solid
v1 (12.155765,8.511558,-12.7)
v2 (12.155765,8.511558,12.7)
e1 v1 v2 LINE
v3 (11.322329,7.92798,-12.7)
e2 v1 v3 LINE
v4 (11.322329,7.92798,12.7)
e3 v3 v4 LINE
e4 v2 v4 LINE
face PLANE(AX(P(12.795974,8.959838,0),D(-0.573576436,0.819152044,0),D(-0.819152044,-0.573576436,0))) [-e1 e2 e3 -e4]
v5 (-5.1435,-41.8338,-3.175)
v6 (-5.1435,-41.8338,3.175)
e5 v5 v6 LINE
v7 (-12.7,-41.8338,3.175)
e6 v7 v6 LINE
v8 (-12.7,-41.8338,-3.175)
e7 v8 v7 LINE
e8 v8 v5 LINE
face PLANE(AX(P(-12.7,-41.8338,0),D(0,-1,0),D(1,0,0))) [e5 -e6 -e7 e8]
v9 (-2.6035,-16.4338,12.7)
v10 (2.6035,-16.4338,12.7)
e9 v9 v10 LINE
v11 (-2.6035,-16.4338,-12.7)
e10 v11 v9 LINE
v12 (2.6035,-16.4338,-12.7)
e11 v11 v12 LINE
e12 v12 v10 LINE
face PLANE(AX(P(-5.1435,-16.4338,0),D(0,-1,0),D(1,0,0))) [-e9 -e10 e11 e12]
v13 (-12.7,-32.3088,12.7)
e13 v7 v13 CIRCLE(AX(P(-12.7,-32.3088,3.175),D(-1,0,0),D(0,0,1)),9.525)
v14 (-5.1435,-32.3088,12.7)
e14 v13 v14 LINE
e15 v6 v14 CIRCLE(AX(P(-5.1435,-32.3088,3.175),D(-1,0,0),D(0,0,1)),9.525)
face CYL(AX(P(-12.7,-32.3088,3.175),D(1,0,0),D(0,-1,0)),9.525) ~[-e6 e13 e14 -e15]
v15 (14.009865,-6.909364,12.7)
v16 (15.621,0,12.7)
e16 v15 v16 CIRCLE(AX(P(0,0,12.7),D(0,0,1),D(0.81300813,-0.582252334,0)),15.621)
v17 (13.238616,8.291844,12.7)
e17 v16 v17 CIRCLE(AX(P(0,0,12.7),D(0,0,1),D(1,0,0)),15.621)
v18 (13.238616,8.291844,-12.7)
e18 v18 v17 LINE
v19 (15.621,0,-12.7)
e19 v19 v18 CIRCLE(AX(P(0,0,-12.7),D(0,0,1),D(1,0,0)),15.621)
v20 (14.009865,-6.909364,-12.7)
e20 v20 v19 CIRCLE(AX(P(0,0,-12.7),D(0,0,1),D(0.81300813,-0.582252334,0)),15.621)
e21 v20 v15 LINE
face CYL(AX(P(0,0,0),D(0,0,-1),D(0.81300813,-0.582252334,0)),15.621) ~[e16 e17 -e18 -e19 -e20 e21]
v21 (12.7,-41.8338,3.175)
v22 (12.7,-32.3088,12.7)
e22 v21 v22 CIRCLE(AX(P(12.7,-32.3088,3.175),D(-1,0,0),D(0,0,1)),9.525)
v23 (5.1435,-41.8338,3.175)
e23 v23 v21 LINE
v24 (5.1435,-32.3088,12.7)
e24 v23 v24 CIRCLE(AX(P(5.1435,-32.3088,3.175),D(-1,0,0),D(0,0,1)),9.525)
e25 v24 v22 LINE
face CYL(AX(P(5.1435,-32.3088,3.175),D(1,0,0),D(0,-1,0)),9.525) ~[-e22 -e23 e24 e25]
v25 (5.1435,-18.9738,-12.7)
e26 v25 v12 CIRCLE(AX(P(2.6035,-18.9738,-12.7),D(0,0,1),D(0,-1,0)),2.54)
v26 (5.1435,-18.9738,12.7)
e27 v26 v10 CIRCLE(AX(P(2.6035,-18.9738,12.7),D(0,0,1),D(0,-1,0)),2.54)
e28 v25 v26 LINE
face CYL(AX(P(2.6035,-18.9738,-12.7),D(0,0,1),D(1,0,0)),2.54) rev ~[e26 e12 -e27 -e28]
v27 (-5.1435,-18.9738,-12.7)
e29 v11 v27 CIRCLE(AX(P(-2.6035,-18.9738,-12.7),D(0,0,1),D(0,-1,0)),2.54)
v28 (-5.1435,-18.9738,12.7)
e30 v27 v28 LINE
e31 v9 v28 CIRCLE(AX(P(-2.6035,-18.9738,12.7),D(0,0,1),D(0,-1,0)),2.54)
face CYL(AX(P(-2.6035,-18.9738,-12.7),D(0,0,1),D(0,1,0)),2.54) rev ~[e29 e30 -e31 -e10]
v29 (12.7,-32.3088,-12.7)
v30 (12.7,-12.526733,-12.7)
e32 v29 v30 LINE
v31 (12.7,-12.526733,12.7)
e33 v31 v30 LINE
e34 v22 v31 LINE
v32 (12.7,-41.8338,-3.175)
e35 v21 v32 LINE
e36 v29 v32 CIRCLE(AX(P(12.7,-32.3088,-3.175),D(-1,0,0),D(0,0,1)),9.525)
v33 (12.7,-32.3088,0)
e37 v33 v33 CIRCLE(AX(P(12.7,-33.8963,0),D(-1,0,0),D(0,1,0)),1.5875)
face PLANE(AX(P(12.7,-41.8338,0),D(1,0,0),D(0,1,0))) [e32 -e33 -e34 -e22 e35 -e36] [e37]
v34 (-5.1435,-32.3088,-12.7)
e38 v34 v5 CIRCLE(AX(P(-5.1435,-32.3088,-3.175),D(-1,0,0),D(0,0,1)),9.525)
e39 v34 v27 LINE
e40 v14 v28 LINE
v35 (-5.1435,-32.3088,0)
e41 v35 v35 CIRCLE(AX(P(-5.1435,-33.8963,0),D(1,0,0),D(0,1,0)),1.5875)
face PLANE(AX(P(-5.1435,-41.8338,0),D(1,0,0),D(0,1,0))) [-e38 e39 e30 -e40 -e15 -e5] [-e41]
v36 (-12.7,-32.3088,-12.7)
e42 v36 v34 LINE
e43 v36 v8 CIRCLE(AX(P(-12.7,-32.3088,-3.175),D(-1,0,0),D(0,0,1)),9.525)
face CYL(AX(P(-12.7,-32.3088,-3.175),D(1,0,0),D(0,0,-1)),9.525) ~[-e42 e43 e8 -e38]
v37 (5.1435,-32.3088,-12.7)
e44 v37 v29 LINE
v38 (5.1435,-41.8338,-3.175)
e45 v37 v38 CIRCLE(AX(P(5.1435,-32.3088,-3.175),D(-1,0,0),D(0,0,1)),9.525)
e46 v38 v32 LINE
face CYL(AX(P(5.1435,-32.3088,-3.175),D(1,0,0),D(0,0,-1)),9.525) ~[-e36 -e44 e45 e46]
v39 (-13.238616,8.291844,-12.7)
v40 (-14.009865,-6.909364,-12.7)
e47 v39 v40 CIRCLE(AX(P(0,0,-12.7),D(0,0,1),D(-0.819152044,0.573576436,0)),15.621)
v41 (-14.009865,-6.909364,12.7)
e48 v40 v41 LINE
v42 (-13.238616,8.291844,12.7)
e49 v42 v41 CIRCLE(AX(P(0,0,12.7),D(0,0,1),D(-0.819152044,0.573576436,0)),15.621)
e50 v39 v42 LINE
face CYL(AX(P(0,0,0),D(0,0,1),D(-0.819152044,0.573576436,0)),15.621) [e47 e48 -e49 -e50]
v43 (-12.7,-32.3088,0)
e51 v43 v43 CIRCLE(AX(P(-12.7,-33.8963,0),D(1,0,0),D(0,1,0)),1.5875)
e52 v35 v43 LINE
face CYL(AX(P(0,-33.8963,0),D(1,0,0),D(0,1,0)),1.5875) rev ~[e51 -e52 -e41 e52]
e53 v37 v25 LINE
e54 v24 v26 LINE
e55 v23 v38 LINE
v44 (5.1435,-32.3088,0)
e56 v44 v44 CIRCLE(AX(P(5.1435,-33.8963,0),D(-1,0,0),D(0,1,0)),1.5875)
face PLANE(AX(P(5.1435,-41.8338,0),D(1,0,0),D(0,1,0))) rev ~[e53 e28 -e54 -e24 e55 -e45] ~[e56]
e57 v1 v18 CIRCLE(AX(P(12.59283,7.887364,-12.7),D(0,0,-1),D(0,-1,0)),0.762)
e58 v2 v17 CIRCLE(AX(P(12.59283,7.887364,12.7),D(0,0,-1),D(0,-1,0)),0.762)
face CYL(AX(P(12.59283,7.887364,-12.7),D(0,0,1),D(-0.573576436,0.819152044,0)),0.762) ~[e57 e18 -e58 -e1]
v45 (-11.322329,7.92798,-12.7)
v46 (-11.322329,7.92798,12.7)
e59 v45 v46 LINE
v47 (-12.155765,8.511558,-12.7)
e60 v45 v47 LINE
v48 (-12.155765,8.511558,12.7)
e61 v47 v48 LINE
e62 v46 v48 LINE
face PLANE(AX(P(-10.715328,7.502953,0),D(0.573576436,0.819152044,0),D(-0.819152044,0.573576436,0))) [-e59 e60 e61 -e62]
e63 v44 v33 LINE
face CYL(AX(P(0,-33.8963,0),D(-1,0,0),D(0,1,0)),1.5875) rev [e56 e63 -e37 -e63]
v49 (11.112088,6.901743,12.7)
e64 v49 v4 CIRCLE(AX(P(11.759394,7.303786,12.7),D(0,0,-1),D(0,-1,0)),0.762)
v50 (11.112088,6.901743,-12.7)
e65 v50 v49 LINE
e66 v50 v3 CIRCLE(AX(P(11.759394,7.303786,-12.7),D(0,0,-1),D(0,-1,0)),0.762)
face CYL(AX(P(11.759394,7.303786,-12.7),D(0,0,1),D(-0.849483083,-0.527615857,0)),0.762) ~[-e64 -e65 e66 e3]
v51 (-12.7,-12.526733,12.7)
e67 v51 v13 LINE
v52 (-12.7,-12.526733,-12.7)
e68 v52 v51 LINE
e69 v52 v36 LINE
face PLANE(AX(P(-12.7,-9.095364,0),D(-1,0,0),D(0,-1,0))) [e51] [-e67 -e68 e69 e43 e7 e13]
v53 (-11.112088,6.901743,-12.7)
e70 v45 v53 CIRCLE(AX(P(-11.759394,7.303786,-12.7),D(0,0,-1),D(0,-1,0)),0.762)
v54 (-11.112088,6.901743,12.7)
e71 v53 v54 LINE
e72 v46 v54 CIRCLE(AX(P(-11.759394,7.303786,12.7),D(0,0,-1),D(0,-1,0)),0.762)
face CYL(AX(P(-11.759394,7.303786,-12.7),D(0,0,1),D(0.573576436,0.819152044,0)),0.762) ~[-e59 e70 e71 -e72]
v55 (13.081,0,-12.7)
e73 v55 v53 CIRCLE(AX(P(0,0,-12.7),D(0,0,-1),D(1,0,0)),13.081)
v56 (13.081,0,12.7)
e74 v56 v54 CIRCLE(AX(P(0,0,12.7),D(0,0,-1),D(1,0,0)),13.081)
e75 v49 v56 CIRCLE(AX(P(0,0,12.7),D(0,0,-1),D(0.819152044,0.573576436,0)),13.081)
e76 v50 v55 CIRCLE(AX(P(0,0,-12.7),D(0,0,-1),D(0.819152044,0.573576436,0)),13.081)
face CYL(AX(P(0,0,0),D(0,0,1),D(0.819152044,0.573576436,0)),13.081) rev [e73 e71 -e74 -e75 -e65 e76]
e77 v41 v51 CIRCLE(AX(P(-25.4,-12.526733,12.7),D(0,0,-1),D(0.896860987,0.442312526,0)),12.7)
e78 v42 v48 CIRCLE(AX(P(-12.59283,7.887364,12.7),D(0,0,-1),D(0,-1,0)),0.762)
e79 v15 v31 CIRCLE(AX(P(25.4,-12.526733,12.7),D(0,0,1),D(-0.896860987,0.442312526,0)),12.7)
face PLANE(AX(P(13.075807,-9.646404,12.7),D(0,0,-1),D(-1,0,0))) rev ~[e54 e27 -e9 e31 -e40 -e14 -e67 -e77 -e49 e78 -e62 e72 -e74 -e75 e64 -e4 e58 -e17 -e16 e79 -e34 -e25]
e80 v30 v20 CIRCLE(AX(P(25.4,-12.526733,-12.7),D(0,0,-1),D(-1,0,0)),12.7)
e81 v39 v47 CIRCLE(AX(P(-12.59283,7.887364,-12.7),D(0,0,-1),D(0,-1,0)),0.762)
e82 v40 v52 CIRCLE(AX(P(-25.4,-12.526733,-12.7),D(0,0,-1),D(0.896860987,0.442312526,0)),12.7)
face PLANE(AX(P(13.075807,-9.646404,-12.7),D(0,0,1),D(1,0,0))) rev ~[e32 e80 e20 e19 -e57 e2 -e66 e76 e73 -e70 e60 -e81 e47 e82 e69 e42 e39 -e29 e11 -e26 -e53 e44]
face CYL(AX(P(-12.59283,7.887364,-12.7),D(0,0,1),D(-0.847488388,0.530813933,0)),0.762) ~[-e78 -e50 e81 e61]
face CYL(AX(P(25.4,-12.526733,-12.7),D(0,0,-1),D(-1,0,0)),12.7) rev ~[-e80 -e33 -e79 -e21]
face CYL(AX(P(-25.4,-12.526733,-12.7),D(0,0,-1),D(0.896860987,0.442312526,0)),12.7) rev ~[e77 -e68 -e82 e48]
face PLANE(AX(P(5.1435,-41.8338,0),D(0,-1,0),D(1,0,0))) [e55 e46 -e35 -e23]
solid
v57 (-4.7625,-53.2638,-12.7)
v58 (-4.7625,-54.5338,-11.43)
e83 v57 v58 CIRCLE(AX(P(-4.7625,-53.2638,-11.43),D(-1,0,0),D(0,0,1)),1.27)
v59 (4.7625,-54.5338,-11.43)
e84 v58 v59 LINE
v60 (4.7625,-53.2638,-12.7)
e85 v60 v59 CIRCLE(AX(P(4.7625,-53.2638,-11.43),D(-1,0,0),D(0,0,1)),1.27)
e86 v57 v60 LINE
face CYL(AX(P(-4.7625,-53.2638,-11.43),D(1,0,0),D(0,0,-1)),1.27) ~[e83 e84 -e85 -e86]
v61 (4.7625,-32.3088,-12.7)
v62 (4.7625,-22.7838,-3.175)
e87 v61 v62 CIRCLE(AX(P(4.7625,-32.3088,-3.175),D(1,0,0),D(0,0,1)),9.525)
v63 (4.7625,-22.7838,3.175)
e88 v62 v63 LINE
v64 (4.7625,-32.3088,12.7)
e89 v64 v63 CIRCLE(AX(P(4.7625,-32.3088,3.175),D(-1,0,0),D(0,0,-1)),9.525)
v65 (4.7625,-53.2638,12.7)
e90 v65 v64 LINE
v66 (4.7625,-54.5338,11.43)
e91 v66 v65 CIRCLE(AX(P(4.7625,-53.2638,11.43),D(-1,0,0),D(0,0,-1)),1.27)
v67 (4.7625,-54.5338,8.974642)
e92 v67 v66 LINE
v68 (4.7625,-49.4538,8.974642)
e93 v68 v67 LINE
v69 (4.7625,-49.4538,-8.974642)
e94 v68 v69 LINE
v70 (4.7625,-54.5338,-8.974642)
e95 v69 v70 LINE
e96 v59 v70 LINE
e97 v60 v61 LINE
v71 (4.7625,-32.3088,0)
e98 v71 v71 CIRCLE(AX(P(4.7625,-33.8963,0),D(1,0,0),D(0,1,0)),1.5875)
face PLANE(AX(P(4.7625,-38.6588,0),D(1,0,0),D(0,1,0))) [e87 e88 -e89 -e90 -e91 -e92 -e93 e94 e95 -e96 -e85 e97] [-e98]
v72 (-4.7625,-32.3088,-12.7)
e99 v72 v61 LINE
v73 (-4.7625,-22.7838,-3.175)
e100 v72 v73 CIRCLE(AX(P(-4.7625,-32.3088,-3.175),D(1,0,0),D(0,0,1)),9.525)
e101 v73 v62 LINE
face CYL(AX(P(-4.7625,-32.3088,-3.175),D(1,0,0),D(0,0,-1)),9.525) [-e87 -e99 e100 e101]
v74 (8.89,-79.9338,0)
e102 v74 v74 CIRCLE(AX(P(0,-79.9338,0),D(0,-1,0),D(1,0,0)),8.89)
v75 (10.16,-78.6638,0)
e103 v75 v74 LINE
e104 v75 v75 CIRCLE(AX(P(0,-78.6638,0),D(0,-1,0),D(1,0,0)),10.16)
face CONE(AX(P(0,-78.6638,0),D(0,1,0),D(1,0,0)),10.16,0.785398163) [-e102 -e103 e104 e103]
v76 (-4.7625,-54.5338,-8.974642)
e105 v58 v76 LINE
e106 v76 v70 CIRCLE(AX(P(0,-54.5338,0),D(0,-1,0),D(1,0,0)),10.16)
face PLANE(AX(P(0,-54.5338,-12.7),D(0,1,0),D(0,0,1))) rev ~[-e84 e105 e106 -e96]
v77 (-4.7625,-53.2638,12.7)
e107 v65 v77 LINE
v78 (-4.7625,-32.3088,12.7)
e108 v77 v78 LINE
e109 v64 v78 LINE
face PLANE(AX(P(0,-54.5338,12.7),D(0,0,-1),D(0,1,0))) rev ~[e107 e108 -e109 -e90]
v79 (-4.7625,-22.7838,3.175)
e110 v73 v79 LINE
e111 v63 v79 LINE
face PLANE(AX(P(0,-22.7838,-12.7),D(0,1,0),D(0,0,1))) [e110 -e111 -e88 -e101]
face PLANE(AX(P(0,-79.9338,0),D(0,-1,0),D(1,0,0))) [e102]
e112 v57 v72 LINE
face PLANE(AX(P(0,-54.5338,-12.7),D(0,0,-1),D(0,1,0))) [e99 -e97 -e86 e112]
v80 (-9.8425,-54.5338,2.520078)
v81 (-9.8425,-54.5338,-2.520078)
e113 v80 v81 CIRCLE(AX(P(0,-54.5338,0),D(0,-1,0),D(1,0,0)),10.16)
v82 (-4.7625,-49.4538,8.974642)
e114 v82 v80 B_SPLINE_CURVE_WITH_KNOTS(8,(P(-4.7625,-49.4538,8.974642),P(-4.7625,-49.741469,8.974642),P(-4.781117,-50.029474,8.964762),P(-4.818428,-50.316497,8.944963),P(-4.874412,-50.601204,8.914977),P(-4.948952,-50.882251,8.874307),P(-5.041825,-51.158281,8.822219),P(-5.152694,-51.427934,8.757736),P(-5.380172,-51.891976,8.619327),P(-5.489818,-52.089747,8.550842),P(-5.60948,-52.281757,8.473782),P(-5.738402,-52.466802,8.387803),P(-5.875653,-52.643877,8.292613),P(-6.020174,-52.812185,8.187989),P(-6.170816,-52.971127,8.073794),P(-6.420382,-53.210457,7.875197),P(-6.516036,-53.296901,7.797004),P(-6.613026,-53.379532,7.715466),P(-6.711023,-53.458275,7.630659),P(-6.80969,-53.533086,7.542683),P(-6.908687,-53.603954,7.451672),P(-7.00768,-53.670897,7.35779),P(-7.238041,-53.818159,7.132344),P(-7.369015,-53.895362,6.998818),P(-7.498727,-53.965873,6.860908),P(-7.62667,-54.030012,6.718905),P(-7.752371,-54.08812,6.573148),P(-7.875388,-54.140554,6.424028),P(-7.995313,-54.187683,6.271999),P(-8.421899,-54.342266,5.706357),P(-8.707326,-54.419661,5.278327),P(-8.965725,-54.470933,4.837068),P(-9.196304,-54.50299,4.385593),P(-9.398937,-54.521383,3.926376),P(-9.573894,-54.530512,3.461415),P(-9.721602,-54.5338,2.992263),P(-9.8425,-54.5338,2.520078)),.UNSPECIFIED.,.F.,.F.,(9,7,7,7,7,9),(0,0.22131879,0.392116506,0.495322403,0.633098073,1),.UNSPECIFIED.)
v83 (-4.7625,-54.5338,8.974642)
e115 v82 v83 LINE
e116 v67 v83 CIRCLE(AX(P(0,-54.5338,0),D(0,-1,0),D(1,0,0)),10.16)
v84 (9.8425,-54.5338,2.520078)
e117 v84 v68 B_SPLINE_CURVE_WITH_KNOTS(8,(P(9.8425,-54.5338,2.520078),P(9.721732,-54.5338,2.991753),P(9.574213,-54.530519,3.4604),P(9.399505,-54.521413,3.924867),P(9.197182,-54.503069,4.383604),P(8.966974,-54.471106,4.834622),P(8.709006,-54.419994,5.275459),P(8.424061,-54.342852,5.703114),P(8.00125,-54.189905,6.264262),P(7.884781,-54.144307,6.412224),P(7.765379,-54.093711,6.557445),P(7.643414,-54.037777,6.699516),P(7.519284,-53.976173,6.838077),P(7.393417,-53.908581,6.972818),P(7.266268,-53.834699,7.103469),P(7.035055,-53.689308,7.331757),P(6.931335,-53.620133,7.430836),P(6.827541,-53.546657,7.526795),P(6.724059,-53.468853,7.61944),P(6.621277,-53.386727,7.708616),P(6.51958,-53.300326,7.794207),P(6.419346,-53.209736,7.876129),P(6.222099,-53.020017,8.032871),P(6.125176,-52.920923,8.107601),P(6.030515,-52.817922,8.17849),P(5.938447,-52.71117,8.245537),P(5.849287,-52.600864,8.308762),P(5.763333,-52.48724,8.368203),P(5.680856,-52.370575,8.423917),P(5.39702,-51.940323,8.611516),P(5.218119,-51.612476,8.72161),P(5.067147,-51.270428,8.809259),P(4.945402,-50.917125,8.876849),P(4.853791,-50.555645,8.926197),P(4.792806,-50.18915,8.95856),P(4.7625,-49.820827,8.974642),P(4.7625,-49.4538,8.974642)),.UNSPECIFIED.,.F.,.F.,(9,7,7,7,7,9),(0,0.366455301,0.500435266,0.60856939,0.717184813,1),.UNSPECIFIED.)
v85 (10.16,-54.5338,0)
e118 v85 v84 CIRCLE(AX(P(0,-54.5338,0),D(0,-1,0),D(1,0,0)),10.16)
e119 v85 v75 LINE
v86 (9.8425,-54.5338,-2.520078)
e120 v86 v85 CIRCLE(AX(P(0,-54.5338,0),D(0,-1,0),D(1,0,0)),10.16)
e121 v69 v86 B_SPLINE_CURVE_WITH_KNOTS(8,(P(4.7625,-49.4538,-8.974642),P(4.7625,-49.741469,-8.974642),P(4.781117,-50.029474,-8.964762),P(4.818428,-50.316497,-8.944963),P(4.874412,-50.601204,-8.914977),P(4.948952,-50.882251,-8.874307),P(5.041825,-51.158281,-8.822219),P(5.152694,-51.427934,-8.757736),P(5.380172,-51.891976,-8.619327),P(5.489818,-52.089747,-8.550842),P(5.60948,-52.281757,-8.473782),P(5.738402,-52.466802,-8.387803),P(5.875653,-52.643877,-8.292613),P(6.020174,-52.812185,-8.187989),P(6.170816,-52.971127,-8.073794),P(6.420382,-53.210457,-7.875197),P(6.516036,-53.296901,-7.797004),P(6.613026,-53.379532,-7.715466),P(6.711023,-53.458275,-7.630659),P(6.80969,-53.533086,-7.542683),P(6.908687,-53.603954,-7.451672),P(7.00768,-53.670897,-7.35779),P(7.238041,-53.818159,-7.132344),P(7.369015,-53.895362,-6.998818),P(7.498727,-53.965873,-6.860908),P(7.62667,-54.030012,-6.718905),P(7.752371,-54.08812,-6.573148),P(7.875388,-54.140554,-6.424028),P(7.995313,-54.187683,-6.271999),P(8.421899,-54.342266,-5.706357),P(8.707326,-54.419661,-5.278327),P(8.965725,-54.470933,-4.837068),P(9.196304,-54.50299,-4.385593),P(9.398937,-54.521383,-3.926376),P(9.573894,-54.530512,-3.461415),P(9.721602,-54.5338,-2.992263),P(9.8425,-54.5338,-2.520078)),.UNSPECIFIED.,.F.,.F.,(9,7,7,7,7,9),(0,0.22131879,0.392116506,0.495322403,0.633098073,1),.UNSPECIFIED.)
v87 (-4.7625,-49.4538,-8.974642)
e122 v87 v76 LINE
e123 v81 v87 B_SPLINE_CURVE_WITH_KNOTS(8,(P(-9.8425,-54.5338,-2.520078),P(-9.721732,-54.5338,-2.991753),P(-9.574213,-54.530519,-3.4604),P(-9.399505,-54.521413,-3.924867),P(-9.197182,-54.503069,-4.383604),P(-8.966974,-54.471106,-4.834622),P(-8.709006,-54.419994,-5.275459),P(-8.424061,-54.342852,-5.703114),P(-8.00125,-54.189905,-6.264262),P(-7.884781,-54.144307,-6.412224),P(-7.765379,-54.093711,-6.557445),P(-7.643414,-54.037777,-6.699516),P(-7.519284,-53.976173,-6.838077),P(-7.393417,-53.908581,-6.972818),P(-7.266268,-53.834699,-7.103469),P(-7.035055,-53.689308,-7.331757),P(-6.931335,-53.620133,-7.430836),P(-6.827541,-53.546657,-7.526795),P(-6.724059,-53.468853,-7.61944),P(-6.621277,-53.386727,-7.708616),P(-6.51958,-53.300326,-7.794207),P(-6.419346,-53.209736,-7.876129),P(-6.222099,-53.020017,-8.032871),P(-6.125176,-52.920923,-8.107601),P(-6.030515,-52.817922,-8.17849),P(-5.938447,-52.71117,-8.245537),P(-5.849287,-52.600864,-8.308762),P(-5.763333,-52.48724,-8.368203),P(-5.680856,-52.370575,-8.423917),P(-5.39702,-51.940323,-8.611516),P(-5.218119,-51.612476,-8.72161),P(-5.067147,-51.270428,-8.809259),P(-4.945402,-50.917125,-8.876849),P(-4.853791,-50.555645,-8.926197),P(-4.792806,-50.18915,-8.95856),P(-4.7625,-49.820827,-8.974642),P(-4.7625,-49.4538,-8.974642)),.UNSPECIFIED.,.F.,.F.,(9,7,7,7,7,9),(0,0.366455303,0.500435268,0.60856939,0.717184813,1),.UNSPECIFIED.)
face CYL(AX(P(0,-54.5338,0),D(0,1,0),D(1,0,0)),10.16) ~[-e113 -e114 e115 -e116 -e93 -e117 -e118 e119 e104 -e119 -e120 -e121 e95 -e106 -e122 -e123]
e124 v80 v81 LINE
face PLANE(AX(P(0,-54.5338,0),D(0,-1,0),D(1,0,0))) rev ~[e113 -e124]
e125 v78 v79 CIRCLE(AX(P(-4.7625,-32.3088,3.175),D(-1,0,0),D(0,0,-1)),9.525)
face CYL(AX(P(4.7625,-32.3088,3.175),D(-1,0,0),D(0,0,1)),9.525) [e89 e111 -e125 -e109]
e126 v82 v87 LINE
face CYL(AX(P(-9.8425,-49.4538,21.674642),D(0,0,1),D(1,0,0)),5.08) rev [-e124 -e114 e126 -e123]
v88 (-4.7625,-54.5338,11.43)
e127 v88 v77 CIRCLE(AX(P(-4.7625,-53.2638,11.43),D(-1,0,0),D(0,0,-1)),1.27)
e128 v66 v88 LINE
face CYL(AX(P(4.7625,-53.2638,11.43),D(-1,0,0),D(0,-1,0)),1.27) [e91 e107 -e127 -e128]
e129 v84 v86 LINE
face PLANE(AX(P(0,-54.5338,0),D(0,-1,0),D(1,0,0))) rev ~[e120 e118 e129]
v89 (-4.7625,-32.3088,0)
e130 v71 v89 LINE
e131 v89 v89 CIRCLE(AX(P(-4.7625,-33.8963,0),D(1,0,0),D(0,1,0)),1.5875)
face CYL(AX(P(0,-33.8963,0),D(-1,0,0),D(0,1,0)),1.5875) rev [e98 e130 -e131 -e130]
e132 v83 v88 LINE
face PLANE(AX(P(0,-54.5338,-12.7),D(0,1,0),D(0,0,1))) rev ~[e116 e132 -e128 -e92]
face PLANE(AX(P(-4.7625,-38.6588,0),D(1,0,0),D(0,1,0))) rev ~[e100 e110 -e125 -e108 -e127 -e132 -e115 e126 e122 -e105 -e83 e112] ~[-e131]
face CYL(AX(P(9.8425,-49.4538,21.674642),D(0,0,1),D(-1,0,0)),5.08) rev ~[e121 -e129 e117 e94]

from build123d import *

# Parameters (mm, degrees)
F1_DEPTH      = 12.7
F0_W          = 7.5565
F0_H          = 25.4
F2_DEPTH      = 12.7
F3_T1_DEPTH   = 25.4
F3_T3_DEPTH   = 12.7
F3_T5_DEPTH   = 12.7
F4_R          = 0.762
F5_W          = 31.75
F5_H          = 25.4
F5_R          = 1.5875
F6_DEPTH      = 4.7625
F7_DEPTH      = 25.4
F7_DEPTH_BACK = 25.4
F8_R          = 10.16
F9_DEPTH      = 25.4
F10_R         = 9.525
F10_2_R       = 9.525
F11_T4_DEPTH  = 43.3492834119
F11_S5_R      = 10.16
F11_T6_DEPTH  = 23
F11_T10_DEPTH = 43.3492834119
F11_S11_R     = 10.16
F11_T12_DEPTH = 23
F12_R         = 1.27
F13_R         = 2.54
F14_SIZE      = 1.27


# Not quite as in the source:
# - a fillet or chamfer that OpenCascade refuses, or shapes differently, is made with other operations: its cross-section is extruded or revolved along the edge and cut away or added


with BuildPart() as f1:
    # F0 (on Top) → F1 (new body, symmetric)
    with BuildSketch(Plane.XY):
        with BuildLine():
            ThreePointArc((12.7, -9.0953637091), (14.8728333044, -4.7764495705), (15.621, 0))
            ThreePointArc((15.621, 0), (14.8980124876, 4.6973252941), (12.7959740838, 8.9598375122))
            Line((12.7959740838, 8.9598375122), (10.7153278913, 7.5029533639))
            ThreePointArc((10.7153278913, 7.5029533639), (12.4755714327, 3.9335325633), (13.081, 0))
            ThreePointArc((13.081, 0), (-3.9335325633, -12.4755714327), (-10.7153278913, 7.5029533639))
            Line((-10.7153278913, 7.5029533639), (-12.7959740838, 8.9598375122))
            ThreePointArc((-12.7959740838, 8.9598375122), (-15.6207793149, -0.0830336901), (-12.7, -9.0953637091))
            ThreePointArc((-12.7, -9.0953637091), (0, -15.621), (12.7, -9.0953637091))
        make_face()
    extrude(amount=F1_DEPTH, both=True)

    # F0 (on Top) → F2 (join, symmetric)
    with BuildSketch(Plane.XY):
        with BuildLine():
            Line((12.7, -16.4338), (12.7, -9.0953637091))
            ThreePointArc((12.7, -9.0953637091), (0, -15.621), (-12.7, -9.0953637091))
            Line((-12.7, -9.0953637091), (-12.7, -16.4338))
            Line((-12.7, -16.4338), (-5.1435, -16.4338))
            Line((-5.1435, -16.4338), (5.1435, -16.4338))
            Line((5.1435, -16.4338), (12.7, -16.4338))
        make_face()
        with Locations((-8.92175, -29.1338)):
            Rectangle(F0_W, F0_H)
        with Locations((8.92175, -29.1338)):
            Rectangle(F0_W, F0_H)
    extrude(amount=F2_DEPTH, both=True)

    # F3: fillet of radius 12.7 on 3 edges, made by hand

    # F3_s2 → F3_t1 (join)
    with BuildSketch(Plane.XY.offset(-12.7)):
        with BuildLine():
            ThreePointArc((-14.0098654709, -6.9093639714), (-13.0318006864, -9.6427001587), (-12.7, -12.5267330538))
            Line((-12.7, -12.5267330538), (-12.7, -9.0953637091))
            ThreePointArc((-12.7, -9.0953637091), (-13.3995849593, -8.0291197475), (-14.0098654709, -6.9093639714))
        make_face()
    extrude(amount=F3_T1_DEPTH)

    # F3_s4 → F3_t3 (join)
    with BuildSketch(Plane.XY):
        with BuildLine():
            ThreePointArc((14.0098654709, -6.9093639714), (13.0318006864, -9.6427001587), (12.7, -12.5267330538))
            Line((12.7, -12.5267330538), (12.7, -9.0953637091))
            ThreePointArc((12.7, -9.0953637091), (13.3995849593, -8.0291197475), (14.0098654709, -6.9093639714))
        make_face()
    extrude(amount=F3_T3_DEPTH)

    # F3_s6 → F3_t5 (join)
    with BuildSketch(Plane.XY.offset(-12.7)):
        with BuildLine():
            ThreePointArc((12.7, -12.5267330538), (13.0318006864, -9.6427001587), (14.0098654709, -6.9093639714))
            ThreePointArc((14.0098654709, -6.9093639714), (13.3995849593, -8.0291197475), (12.7, -9.0953637091))
            Line((12.7, -9.0953637091), (12.7, -12.5267330538))
        make_face()
    extrude(amount=F3_T5_DEPTH)

    # F4
    f4_edges = [f1.edges().sort_by_distance(p)[0] for p in [
        (-12.795974, 8.959838, 0),
        (-10.715328, 7.502953, -6.35),
        (-10.715328, 7.502953, 6.35),
        (12.795974, 8.959838, 6.35),
        (12.795974, 8.959838, -6.35),
        (10.715328, 7.502953, 6.35),
        (10.715328, 7.502953, -6.35),
    ]]
    fillet(f4_edges, radius=F4_R)

    # F5 (on Right) → F7 (cut, two sides)
    with BuildSketch(Plane.YZ) as f7_sk:
        with Locations((-33.8963, 0)):
            Circle(F5_R)
    extrude(amount=-F7_DEPTH, mode=Mode.SUBTRACT)
    extrude(f7_sk.sketch, amount=F7_DEPTH_BACK, mode=Mode.SUBTRACT)

    # F10
    f10_edges = [f1.edges().sort_by_distance(p)[0] for p in [
        (8.92175, -41.8338, -12.7),
        (-8.92175, -41.8338, -12.7),
        (8.92175, -41.8338, 12.7),
        (-8.92175, -41.8338, 12.7),
    ]]
    fillet(f10_edges, radius=F10_R)

    # F13
    f13_edges = [f1.edges().sort_by_distance(p)[0] for p in [
        (5.1435, -16.4338, 0),
        (-5.1435, -16.4338, 0),
    ]]
    fillet(f13_edges, radius=F13_R)


with BuildPart() as f6:
    # F5 (on Right) → F6 (new body, symmetric)
    with BuildSketch(Plane.YZ):
        with Locations((-38.6588, 0)):
            Rectangle(F5_W, F5_H)
        with Locations((-33.8963, 0)):
            Circle(F5_R, mode=Mode.SUBTRACT)
    extrude(amount=F6_DEPTH, both=True)

    # F8 (on face) → F9 (join)
    with BuildSketch(Plane.XZ.offset(54.5338)):
        Circle(F8_R)
    extrude(amount=F9_DEPTH)

    # F10#2
    f10_2_edges = [f6.edges().sort_by_distance(p)[0] for p in [
        (0, -22.7838, -12.7),
        (0, -22.7838, 12.7),
    ]]
    fillet(f10_2_edges, radius=F10_2_R)

    # F11: fillet of radius 5.08 on 6 edges, made by hand


with BuildPart() as f11_tool2:
    # F11_s3 → F11_t4 (new body)
    with BuildSketch(Plane.XY.offset(21.6746417059)):
        with BuildLine():
            ThreePointArc((-4.7625, -49.4538), (-6.2503975516, -53.0459024484), (-9.8425, -54.5338))
            Line((-9.8425, -54.5338), (-4.7625, -54.5338))
            Line((-4.7625, -54.5338), (-4.7625, -49.4538))
        make_face()
    extrude(amount=-F11_T4_DEPTH)

    # F11_s5 → F11_t6 (intersect, symmetric)
    with BuildSketch(Plane.XZ.offset(52)):
        Circle(F11_S5_R)
    extrude(amount=F11_T6_DEPTH, both=True, mode=Mode.INTERSECT)


with BuildPart() as f6_1:
    add(f6.part)

    # F11_t1: union F11_tool2
    add(f11_tool2.part)


with BuildPart() as f11_tool8:
    # F11_s9 → F11_t10 (new body)
    with BuildSketch(Plane.XY.offset(21.6746417059)):
        with BuildLine():
            ThreePointArc((4.7625, -49.4538), (6.2503975516, -53.0459024484), (9.8425, -54.5338))
            Line((9.8425, -54.5338), (4.7625, -54.5338))
            Line((4.7625, -54.5338), (4.7625, -49.4538))
        make_face()
    extrude(amount=-F11_T10_DEPTH)

    # F11_s11 → F11_t12 (intersect, symmetric)
    with BuildSketch(Plane.XZ.offset(52)):
        Circle(F11_S11_R)
    extrude(amount=F11_T12_DEPTH, both=True, mode=Mode.INTERSECT)


with BuildPart() as f6_2:
    add(f6_1.part)

    # F11_t7: union F11_tool8
    add(f11_tool8.part)

    # F12
    f12_edges = [f6_2.edges().sort_by_distance(p)[0] for p in [
        (0, -54.5338, 12.7),
        (0, -54.5338, -12.7),
    ]]
    fillet(f12_edges, radius=F12_R)

    # F14
    f14_edges = [f6_2.edges().sort_by_distance(p)[0] for p in [
        (-10.16, -79.9338, 0),
    ]]
    chamfer(f14_edges, length=F14_SIZE)


solid = Compound([f1.part, f6_2.part])
